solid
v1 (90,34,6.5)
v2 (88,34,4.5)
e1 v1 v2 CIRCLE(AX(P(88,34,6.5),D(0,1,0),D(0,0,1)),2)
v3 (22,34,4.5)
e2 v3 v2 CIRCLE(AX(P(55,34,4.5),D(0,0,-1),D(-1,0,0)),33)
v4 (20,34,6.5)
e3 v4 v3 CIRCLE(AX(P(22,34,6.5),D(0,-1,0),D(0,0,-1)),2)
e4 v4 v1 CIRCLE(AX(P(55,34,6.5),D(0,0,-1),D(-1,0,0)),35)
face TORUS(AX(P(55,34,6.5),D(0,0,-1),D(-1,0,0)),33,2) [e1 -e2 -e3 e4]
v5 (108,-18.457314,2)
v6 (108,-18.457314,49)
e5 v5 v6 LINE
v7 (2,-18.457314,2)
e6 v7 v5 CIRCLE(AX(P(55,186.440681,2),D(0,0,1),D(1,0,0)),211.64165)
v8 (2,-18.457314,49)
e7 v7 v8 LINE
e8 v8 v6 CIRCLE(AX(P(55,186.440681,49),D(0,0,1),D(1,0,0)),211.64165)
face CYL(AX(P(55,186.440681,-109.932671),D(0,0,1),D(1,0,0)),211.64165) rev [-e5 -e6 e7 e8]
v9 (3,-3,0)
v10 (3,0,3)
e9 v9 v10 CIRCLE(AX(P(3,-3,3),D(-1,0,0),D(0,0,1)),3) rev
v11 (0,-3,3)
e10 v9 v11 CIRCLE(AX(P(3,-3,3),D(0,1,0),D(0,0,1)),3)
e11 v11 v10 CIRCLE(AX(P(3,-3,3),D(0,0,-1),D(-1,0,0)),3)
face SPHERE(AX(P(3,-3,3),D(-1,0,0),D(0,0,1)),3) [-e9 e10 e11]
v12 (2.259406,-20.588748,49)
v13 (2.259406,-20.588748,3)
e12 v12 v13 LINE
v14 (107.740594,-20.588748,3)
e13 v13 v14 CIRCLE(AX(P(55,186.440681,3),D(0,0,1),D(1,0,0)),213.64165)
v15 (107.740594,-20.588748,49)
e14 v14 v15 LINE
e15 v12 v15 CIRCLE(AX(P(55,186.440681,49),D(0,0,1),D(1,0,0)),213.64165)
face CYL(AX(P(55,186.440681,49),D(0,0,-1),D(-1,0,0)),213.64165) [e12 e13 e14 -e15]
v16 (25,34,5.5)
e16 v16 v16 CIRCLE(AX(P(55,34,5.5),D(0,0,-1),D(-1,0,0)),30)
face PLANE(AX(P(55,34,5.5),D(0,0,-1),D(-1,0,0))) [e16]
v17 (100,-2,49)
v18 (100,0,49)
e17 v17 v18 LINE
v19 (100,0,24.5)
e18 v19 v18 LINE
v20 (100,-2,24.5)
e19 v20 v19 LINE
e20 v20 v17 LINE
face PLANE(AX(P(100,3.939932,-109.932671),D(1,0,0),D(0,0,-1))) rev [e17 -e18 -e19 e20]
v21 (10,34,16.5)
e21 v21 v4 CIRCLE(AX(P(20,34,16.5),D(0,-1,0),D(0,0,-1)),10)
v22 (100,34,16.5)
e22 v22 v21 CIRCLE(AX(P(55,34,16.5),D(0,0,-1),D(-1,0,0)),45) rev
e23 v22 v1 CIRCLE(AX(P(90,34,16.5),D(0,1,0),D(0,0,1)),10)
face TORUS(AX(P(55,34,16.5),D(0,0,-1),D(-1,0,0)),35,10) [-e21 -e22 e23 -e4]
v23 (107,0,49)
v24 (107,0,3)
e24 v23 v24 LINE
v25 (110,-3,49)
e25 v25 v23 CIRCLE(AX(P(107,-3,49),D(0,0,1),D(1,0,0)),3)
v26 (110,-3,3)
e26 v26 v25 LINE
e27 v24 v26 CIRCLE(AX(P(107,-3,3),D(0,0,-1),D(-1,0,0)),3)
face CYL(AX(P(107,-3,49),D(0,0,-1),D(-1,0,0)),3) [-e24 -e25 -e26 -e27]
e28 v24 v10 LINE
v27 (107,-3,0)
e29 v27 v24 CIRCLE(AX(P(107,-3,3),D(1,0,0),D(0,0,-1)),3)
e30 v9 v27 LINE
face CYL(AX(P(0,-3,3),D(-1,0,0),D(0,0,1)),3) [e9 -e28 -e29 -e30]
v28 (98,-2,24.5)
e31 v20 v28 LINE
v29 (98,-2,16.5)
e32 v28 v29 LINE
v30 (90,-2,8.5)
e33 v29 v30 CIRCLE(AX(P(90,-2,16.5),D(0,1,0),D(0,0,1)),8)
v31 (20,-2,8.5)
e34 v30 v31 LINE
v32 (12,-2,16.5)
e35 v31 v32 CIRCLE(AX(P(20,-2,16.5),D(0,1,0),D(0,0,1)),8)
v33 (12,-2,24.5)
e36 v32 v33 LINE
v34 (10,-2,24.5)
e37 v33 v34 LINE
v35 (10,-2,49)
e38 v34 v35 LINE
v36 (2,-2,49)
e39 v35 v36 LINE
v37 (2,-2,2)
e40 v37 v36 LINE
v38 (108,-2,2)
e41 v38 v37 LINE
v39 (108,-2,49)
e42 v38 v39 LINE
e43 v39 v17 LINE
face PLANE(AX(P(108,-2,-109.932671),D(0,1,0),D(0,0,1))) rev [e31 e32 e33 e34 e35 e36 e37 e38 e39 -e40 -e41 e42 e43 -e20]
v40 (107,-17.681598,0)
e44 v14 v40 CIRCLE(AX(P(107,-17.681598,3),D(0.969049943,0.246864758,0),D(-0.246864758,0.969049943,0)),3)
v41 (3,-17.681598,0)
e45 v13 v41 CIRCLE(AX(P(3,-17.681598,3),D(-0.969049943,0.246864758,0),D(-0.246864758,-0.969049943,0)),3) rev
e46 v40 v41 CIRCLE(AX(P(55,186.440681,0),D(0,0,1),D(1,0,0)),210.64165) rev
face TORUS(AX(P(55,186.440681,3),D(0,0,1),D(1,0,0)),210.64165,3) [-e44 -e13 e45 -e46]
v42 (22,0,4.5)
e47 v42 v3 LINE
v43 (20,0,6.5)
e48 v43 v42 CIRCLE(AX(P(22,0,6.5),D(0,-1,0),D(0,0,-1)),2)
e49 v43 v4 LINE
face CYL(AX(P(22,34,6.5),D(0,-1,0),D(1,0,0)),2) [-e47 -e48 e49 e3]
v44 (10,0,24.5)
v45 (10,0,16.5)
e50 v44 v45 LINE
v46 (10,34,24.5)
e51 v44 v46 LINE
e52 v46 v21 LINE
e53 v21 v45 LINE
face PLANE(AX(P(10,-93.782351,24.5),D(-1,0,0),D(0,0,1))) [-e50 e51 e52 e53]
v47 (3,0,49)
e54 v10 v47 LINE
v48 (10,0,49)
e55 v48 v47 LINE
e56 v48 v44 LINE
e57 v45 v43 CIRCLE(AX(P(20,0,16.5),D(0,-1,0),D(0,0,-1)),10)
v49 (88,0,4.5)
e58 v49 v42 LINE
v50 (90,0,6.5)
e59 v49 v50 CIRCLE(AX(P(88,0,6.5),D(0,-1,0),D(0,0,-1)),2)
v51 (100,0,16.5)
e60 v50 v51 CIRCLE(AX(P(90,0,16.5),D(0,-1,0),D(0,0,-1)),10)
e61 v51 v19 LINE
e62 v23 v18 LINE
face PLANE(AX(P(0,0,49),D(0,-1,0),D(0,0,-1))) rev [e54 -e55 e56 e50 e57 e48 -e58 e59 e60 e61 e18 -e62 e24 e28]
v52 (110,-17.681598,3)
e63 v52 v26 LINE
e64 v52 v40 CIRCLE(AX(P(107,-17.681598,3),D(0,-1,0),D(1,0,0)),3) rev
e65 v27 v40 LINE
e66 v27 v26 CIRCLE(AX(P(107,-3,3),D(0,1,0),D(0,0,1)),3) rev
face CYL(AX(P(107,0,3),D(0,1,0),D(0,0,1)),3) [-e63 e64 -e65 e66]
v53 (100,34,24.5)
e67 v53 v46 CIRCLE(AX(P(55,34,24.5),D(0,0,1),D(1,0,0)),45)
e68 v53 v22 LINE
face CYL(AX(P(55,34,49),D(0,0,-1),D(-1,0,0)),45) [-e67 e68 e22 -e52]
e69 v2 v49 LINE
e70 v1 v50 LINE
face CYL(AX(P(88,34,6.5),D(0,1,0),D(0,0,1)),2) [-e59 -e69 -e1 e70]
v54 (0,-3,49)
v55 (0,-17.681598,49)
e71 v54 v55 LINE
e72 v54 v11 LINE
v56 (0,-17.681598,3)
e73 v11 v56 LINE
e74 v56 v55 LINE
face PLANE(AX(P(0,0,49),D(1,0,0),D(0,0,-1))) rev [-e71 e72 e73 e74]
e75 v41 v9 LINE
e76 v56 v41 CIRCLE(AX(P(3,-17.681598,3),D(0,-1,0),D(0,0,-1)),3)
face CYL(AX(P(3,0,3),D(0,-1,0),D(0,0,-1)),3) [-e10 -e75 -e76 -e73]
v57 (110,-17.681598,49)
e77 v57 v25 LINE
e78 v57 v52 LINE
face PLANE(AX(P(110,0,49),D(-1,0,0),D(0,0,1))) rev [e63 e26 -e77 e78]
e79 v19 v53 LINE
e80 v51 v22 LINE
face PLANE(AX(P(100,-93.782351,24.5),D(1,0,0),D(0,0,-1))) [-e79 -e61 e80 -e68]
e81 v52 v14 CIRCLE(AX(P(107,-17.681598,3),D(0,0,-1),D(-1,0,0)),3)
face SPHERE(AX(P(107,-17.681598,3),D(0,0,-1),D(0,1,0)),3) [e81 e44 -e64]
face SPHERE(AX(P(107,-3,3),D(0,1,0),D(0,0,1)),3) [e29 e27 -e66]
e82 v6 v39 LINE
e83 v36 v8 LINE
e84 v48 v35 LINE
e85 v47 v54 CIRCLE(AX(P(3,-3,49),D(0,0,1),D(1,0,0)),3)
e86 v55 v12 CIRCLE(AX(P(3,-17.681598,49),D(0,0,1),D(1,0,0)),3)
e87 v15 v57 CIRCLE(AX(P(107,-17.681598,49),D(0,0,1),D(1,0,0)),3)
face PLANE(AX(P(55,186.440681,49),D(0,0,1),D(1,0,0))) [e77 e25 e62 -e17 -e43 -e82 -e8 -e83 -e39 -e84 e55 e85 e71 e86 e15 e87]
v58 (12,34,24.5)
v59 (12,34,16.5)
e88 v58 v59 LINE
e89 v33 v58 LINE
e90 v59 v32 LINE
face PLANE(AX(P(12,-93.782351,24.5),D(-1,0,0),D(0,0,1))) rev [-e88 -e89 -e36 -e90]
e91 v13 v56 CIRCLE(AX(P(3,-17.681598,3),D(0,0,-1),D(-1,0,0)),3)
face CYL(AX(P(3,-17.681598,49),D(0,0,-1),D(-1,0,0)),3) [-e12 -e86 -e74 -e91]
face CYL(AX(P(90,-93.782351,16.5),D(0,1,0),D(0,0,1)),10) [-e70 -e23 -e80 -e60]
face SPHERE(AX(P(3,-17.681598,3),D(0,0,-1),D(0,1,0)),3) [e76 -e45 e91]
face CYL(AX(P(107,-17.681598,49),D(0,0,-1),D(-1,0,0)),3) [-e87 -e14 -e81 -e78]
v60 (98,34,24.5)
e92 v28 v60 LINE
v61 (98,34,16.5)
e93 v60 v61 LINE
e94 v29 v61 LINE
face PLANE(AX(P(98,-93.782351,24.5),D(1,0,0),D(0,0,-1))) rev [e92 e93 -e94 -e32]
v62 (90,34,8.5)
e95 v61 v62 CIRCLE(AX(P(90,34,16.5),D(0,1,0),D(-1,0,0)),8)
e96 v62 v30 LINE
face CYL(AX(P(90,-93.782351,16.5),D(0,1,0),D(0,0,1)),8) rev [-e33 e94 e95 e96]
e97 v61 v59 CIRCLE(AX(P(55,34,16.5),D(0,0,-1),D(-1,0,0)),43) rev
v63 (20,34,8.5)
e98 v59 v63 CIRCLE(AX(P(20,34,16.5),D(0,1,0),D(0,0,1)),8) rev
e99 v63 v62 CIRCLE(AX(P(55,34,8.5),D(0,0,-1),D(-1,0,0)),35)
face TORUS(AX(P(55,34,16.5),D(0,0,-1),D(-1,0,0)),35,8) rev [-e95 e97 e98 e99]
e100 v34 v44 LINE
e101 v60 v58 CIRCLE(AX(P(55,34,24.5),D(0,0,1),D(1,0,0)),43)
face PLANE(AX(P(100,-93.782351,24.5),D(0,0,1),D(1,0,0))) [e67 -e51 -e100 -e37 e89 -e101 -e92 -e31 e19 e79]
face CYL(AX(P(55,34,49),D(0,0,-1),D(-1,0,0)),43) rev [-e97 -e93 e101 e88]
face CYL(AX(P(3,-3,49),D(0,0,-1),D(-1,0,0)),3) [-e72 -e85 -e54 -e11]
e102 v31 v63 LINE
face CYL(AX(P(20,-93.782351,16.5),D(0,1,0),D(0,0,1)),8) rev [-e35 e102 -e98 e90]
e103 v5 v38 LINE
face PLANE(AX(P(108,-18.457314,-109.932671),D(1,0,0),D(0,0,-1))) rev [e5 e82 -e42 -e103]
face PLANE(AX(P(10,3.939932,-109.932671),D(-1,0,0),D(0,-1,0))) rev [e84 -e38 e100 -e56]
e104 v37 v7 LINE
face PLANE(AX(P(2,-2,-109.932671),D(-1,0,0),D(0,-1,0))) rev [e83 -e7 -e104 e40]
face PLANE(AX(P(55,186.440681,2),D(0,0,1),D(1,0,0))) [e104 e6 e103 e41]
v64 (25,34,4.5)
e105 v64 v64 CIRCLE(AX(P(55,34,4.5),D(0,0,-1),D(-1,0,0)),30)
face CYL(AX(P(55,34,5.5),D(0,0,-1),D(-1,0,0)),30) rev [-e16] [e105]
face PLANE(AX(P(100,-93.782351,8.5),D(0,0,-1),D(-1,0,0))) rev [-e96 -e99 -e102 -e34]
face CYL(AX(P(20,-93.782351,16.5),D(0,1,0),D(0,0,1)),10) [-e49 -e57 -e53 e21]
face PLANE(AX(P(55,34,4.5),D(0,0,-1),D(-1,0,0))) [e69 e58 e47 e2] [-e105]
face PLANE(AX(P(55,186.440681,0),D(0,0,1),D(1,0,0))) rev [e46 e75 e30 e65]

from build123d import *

# Parameters (mm, degrees)
BOSS_EXTRUDE1_DEPTH = 49
CUT_EXTRUDE1_DEPTH  = 39
SHELL2_START        = 2
SHELL2_DEPTH        = 8
BOSS_EXTRUDE8_START = -81
SKETCH5_W           = 90
SKETCH5_H           = 18
BOSS_EXTRUDE8_DEPTH = 81
CUT_EXTRUDE2_DEPTH  = 142.941008873
FILLET1_R           = 10
SHELL4_DEPTH        = 34
SHELL4_2_ANGLE      = 180
CUT_EXTRUDE6_START  = -3
CUT_EXTRUDE6_DEPTH  = 3
BOSS_EXTRUDE9_DEPTH = 2
SKETCH10_R          = 30
CUT_EXTRUDE4_DEPTH  = 1
FILLET2_R           = 2
FILLET3_R           = 3


with BuildPart() as part:
    # Sketch1 → Boss-Extrude1 (new body)
    with BuildSketch(Plane.XY):
        with BuildLine():
            Line((0, 0), (110, 0))
            Line((110, 0), (110, -20))
            ThreePointArc((110, -20), (55, -27.200969375), (0, -20))
            Line((0, -20), (0, 0))
        make_face()
    extrude(amount=BOSS_EXTRUDE1_DEPTH)

    # Sketch3 → Cut-Extrude1 (cut)
    with BuildSketch(Plane.XY.offset(49)):
        with BuildLine():
            Line((10, 3.939932323), (10, -2))
            Line((10, -2), (2, -2))
            Line((2, -2), (2, -18.45731355))
            ThreePointArc((2, -18.45731355), (55, -25.200969375), (108, -18.45731355))
            Line((108, -18.45731355), (108, -2))
            Line((108, -2), (100, -2))
            Line((100, -2), (100, 3.939932323))
            Line((100, 3.939932323), (10, 3.939932323))
        make_face()
    extrude(amount=-CUT_EXTRUDE1_DEPTH, mode=Mode.SUBTRACT)

    # Shell2: read off the stored shape, not the designer's step
    # Shell2 outline → Shell2 (cut)
    with BuildSketch(Plane.XY.offset(SHELL2_START)):
        with BuildLine():
            Line((108, -18.45731355), (108, -2))
            Line((108, -2), (2, -2))
            Line((2, -2), (2, -18.45731355))
            ThreePointArc((2, -18.45731355), (55, -25.200969375), (108, -18.45731355))
        make_face()
    extrude(amount=SHELL2_DEPTH, mode=Mode.SUBTRACT)

    # Sketch5 → Boss-Extrude8 (add)
    with BuildSketch(Plane(origin=(0, 79, 0), x_dir=(1, 0, 0), z_dir=(0, 1, 0)).offset(BOSS_EXTRUDE8_START)):
        with Locations((55, -15.5)):
            Rectangle(SKETCH5_W, SKETCH5_H)
    extrude(amount=BOSS_EXTRUDE8_DEPTH)

    # Sketch6 → Cut-Extrude2 (cut, through all)
    with BuildSketch(Plane(origin=(0, 0, 6.5), x_dir=(-1, 0, 0), z_dir=(0, 0, -1))):
        with BuildLine():
            Line((-100, 84.89286518), (-10, 84.89286518))
            Line((-10, 84.89286518), (-10, 34))
            ThreePointArc((-10, 34), (-55, 79), (-100, 34))
            Line((-100, 34), (-100, 84.89286518))
        make_face()
    extrude(amount=-CUT_EXTRUDE2_DEPTH, mode=Mode.SUBTRACT)

    # Fillet1
    fillet1_edges = [part.edges().sort_by_distance(p)[0] for p in [
        (100, 17, 6.5),
        (10, 17, 6.5),
        (55, 79, 6.5),
    ]]
    fillet(fillet1_edges, radius=FILLET1_R)

    # Shell4: read off the stored shape, not the designer's step
    # Shell4 outline → Shell4 (cut)
    with BuildSketch(Plane(origin=(0, 0, 0), x_dir=(1, 0, 0), z_dir=(0, 1, 0))):
        with BuildLine():
            ThreePointArc((20, -8.5), (14.343145751, -10.843145751), (12, -16.5))
            Line((12, -16.5), (12, -24.5))
            Line((12, -24.5), (98, -24.5))
            Line((98, -24.5), (98, -16.5))
            ThreePointArc((98, -16.5), (95.656854249, -10.843145751), (90, -8.5))
            Line((90, -8.5), (20, -8.5))
        make_face()
    extrude(amount=SHELL4_DEPTH, mode=Mode.SUBTRACT)

    # Shell4 2 outline → Shell4 2 (revolve, cut)
    with BuildSketch(Plane(origin=(55, 34, 0), x_dir=(1, 0, 0), z_dir=(0, -1, 0))):
        with BuildLine():
            Line((0, 24.5), (0, 8.5))
            Line((0, 8.5), (35, 8.5))
            ThreePointArc((35, 8.5), (40.656854249, 10.843145751), (43, 16.5))
            Line((43, 16.5), (43, 24.5))
            Line((43, 24.5), (0, 24.5))
        make_face()
    revolve(axis=Axis((55, 34, 0), (0, 0, 1)), revolution_arc=SHELL4_2_ANGLE, mode=Mode.SUBTRACT)

    # Sketch12 → Cut-Extrude6 (cut)
    with BuildSketch(Plane(origin=(0, 0, 0), x_dir=(1, 0, 0), z_dir=(0, 1, 0)).offset(CUT_EXTRUDE6_START)):
        with BuildLine():
            Line((90, -8.5), (20, -8.5))
            ThreePointArc((20, -8.5), (14.343145751, -10.843145751), (12, -16.5))
            Line((12, -16.5), (12, -24.5))
            Line((12, -24.5), (98, -24.5))
            Line((98, -24.5), (98, -16.5))
            ThreePointArc((98, -16.5), (95.656854249, -10.843145751), (90, -8.5))
        make_face()
    extrude(amount=CUT_EXTRUDE6_DEPTH, mode=Mode.SUBTRACT)

    # Sketch9 → Boss-Extrude9 (add)
    with BuildSketch(Plane(origin=(0, 0, 6.5), x_dir=(-1, 0, 0), z_dir=(0, 0, -1))):
        with BuildLine():
            Line((-90, 0), (-20, 0))
            Line((-20, 0), (-20, 34))
            ThreePointArc((-20, 34), (-55, 69), (-90, 34))
            Line((-90, 34), (-90, 0))
        make_face()
    extrude(amount=BOSS_EXTRUDE9_DEPTH)

    # Sketch10 → Cut-Extrude4 (cut)
    with BuildSketch(Plane(origin=(0, 0, 4.5), x_dir=(-1, 0, 0), z_dir=(0, 0, -1))):
        with Locations((-55, 34)):
            Circle(SKETCH10_R)
    extrude(amount=-CUT_EXTRUDE4_DEPTH, mode=Mode.SUBTRACT)

    # Fillet2
    fillet2_edges = [part.edges().sort_by_distance(p)[0] for p in [
        (20, 17, 4.5),
        (55, 69, 4.5),
        (90, 17, 4.5),
    ]]
    fillet(fillet2_edges, radius=FILLET2_R - 0.0001)  # a hair under: the kernel refuses the full size

    # Fillet3
    fillet3_edges = [part.edges().sort_by_distance(p)[0] for p in [
        (55, 0, 0),
        (110, -10, 0),
        (55, -27.200969375, 0),
        (0, -10, 0),
        (0, 0, 24.5),
        (110, 0, 24.5),
        (110, -20, 24.5),
        (0, -20, 24.5),
    ]]
    fillet(fillet3_edges, radius=FILLET3_R)


solid = part.part
